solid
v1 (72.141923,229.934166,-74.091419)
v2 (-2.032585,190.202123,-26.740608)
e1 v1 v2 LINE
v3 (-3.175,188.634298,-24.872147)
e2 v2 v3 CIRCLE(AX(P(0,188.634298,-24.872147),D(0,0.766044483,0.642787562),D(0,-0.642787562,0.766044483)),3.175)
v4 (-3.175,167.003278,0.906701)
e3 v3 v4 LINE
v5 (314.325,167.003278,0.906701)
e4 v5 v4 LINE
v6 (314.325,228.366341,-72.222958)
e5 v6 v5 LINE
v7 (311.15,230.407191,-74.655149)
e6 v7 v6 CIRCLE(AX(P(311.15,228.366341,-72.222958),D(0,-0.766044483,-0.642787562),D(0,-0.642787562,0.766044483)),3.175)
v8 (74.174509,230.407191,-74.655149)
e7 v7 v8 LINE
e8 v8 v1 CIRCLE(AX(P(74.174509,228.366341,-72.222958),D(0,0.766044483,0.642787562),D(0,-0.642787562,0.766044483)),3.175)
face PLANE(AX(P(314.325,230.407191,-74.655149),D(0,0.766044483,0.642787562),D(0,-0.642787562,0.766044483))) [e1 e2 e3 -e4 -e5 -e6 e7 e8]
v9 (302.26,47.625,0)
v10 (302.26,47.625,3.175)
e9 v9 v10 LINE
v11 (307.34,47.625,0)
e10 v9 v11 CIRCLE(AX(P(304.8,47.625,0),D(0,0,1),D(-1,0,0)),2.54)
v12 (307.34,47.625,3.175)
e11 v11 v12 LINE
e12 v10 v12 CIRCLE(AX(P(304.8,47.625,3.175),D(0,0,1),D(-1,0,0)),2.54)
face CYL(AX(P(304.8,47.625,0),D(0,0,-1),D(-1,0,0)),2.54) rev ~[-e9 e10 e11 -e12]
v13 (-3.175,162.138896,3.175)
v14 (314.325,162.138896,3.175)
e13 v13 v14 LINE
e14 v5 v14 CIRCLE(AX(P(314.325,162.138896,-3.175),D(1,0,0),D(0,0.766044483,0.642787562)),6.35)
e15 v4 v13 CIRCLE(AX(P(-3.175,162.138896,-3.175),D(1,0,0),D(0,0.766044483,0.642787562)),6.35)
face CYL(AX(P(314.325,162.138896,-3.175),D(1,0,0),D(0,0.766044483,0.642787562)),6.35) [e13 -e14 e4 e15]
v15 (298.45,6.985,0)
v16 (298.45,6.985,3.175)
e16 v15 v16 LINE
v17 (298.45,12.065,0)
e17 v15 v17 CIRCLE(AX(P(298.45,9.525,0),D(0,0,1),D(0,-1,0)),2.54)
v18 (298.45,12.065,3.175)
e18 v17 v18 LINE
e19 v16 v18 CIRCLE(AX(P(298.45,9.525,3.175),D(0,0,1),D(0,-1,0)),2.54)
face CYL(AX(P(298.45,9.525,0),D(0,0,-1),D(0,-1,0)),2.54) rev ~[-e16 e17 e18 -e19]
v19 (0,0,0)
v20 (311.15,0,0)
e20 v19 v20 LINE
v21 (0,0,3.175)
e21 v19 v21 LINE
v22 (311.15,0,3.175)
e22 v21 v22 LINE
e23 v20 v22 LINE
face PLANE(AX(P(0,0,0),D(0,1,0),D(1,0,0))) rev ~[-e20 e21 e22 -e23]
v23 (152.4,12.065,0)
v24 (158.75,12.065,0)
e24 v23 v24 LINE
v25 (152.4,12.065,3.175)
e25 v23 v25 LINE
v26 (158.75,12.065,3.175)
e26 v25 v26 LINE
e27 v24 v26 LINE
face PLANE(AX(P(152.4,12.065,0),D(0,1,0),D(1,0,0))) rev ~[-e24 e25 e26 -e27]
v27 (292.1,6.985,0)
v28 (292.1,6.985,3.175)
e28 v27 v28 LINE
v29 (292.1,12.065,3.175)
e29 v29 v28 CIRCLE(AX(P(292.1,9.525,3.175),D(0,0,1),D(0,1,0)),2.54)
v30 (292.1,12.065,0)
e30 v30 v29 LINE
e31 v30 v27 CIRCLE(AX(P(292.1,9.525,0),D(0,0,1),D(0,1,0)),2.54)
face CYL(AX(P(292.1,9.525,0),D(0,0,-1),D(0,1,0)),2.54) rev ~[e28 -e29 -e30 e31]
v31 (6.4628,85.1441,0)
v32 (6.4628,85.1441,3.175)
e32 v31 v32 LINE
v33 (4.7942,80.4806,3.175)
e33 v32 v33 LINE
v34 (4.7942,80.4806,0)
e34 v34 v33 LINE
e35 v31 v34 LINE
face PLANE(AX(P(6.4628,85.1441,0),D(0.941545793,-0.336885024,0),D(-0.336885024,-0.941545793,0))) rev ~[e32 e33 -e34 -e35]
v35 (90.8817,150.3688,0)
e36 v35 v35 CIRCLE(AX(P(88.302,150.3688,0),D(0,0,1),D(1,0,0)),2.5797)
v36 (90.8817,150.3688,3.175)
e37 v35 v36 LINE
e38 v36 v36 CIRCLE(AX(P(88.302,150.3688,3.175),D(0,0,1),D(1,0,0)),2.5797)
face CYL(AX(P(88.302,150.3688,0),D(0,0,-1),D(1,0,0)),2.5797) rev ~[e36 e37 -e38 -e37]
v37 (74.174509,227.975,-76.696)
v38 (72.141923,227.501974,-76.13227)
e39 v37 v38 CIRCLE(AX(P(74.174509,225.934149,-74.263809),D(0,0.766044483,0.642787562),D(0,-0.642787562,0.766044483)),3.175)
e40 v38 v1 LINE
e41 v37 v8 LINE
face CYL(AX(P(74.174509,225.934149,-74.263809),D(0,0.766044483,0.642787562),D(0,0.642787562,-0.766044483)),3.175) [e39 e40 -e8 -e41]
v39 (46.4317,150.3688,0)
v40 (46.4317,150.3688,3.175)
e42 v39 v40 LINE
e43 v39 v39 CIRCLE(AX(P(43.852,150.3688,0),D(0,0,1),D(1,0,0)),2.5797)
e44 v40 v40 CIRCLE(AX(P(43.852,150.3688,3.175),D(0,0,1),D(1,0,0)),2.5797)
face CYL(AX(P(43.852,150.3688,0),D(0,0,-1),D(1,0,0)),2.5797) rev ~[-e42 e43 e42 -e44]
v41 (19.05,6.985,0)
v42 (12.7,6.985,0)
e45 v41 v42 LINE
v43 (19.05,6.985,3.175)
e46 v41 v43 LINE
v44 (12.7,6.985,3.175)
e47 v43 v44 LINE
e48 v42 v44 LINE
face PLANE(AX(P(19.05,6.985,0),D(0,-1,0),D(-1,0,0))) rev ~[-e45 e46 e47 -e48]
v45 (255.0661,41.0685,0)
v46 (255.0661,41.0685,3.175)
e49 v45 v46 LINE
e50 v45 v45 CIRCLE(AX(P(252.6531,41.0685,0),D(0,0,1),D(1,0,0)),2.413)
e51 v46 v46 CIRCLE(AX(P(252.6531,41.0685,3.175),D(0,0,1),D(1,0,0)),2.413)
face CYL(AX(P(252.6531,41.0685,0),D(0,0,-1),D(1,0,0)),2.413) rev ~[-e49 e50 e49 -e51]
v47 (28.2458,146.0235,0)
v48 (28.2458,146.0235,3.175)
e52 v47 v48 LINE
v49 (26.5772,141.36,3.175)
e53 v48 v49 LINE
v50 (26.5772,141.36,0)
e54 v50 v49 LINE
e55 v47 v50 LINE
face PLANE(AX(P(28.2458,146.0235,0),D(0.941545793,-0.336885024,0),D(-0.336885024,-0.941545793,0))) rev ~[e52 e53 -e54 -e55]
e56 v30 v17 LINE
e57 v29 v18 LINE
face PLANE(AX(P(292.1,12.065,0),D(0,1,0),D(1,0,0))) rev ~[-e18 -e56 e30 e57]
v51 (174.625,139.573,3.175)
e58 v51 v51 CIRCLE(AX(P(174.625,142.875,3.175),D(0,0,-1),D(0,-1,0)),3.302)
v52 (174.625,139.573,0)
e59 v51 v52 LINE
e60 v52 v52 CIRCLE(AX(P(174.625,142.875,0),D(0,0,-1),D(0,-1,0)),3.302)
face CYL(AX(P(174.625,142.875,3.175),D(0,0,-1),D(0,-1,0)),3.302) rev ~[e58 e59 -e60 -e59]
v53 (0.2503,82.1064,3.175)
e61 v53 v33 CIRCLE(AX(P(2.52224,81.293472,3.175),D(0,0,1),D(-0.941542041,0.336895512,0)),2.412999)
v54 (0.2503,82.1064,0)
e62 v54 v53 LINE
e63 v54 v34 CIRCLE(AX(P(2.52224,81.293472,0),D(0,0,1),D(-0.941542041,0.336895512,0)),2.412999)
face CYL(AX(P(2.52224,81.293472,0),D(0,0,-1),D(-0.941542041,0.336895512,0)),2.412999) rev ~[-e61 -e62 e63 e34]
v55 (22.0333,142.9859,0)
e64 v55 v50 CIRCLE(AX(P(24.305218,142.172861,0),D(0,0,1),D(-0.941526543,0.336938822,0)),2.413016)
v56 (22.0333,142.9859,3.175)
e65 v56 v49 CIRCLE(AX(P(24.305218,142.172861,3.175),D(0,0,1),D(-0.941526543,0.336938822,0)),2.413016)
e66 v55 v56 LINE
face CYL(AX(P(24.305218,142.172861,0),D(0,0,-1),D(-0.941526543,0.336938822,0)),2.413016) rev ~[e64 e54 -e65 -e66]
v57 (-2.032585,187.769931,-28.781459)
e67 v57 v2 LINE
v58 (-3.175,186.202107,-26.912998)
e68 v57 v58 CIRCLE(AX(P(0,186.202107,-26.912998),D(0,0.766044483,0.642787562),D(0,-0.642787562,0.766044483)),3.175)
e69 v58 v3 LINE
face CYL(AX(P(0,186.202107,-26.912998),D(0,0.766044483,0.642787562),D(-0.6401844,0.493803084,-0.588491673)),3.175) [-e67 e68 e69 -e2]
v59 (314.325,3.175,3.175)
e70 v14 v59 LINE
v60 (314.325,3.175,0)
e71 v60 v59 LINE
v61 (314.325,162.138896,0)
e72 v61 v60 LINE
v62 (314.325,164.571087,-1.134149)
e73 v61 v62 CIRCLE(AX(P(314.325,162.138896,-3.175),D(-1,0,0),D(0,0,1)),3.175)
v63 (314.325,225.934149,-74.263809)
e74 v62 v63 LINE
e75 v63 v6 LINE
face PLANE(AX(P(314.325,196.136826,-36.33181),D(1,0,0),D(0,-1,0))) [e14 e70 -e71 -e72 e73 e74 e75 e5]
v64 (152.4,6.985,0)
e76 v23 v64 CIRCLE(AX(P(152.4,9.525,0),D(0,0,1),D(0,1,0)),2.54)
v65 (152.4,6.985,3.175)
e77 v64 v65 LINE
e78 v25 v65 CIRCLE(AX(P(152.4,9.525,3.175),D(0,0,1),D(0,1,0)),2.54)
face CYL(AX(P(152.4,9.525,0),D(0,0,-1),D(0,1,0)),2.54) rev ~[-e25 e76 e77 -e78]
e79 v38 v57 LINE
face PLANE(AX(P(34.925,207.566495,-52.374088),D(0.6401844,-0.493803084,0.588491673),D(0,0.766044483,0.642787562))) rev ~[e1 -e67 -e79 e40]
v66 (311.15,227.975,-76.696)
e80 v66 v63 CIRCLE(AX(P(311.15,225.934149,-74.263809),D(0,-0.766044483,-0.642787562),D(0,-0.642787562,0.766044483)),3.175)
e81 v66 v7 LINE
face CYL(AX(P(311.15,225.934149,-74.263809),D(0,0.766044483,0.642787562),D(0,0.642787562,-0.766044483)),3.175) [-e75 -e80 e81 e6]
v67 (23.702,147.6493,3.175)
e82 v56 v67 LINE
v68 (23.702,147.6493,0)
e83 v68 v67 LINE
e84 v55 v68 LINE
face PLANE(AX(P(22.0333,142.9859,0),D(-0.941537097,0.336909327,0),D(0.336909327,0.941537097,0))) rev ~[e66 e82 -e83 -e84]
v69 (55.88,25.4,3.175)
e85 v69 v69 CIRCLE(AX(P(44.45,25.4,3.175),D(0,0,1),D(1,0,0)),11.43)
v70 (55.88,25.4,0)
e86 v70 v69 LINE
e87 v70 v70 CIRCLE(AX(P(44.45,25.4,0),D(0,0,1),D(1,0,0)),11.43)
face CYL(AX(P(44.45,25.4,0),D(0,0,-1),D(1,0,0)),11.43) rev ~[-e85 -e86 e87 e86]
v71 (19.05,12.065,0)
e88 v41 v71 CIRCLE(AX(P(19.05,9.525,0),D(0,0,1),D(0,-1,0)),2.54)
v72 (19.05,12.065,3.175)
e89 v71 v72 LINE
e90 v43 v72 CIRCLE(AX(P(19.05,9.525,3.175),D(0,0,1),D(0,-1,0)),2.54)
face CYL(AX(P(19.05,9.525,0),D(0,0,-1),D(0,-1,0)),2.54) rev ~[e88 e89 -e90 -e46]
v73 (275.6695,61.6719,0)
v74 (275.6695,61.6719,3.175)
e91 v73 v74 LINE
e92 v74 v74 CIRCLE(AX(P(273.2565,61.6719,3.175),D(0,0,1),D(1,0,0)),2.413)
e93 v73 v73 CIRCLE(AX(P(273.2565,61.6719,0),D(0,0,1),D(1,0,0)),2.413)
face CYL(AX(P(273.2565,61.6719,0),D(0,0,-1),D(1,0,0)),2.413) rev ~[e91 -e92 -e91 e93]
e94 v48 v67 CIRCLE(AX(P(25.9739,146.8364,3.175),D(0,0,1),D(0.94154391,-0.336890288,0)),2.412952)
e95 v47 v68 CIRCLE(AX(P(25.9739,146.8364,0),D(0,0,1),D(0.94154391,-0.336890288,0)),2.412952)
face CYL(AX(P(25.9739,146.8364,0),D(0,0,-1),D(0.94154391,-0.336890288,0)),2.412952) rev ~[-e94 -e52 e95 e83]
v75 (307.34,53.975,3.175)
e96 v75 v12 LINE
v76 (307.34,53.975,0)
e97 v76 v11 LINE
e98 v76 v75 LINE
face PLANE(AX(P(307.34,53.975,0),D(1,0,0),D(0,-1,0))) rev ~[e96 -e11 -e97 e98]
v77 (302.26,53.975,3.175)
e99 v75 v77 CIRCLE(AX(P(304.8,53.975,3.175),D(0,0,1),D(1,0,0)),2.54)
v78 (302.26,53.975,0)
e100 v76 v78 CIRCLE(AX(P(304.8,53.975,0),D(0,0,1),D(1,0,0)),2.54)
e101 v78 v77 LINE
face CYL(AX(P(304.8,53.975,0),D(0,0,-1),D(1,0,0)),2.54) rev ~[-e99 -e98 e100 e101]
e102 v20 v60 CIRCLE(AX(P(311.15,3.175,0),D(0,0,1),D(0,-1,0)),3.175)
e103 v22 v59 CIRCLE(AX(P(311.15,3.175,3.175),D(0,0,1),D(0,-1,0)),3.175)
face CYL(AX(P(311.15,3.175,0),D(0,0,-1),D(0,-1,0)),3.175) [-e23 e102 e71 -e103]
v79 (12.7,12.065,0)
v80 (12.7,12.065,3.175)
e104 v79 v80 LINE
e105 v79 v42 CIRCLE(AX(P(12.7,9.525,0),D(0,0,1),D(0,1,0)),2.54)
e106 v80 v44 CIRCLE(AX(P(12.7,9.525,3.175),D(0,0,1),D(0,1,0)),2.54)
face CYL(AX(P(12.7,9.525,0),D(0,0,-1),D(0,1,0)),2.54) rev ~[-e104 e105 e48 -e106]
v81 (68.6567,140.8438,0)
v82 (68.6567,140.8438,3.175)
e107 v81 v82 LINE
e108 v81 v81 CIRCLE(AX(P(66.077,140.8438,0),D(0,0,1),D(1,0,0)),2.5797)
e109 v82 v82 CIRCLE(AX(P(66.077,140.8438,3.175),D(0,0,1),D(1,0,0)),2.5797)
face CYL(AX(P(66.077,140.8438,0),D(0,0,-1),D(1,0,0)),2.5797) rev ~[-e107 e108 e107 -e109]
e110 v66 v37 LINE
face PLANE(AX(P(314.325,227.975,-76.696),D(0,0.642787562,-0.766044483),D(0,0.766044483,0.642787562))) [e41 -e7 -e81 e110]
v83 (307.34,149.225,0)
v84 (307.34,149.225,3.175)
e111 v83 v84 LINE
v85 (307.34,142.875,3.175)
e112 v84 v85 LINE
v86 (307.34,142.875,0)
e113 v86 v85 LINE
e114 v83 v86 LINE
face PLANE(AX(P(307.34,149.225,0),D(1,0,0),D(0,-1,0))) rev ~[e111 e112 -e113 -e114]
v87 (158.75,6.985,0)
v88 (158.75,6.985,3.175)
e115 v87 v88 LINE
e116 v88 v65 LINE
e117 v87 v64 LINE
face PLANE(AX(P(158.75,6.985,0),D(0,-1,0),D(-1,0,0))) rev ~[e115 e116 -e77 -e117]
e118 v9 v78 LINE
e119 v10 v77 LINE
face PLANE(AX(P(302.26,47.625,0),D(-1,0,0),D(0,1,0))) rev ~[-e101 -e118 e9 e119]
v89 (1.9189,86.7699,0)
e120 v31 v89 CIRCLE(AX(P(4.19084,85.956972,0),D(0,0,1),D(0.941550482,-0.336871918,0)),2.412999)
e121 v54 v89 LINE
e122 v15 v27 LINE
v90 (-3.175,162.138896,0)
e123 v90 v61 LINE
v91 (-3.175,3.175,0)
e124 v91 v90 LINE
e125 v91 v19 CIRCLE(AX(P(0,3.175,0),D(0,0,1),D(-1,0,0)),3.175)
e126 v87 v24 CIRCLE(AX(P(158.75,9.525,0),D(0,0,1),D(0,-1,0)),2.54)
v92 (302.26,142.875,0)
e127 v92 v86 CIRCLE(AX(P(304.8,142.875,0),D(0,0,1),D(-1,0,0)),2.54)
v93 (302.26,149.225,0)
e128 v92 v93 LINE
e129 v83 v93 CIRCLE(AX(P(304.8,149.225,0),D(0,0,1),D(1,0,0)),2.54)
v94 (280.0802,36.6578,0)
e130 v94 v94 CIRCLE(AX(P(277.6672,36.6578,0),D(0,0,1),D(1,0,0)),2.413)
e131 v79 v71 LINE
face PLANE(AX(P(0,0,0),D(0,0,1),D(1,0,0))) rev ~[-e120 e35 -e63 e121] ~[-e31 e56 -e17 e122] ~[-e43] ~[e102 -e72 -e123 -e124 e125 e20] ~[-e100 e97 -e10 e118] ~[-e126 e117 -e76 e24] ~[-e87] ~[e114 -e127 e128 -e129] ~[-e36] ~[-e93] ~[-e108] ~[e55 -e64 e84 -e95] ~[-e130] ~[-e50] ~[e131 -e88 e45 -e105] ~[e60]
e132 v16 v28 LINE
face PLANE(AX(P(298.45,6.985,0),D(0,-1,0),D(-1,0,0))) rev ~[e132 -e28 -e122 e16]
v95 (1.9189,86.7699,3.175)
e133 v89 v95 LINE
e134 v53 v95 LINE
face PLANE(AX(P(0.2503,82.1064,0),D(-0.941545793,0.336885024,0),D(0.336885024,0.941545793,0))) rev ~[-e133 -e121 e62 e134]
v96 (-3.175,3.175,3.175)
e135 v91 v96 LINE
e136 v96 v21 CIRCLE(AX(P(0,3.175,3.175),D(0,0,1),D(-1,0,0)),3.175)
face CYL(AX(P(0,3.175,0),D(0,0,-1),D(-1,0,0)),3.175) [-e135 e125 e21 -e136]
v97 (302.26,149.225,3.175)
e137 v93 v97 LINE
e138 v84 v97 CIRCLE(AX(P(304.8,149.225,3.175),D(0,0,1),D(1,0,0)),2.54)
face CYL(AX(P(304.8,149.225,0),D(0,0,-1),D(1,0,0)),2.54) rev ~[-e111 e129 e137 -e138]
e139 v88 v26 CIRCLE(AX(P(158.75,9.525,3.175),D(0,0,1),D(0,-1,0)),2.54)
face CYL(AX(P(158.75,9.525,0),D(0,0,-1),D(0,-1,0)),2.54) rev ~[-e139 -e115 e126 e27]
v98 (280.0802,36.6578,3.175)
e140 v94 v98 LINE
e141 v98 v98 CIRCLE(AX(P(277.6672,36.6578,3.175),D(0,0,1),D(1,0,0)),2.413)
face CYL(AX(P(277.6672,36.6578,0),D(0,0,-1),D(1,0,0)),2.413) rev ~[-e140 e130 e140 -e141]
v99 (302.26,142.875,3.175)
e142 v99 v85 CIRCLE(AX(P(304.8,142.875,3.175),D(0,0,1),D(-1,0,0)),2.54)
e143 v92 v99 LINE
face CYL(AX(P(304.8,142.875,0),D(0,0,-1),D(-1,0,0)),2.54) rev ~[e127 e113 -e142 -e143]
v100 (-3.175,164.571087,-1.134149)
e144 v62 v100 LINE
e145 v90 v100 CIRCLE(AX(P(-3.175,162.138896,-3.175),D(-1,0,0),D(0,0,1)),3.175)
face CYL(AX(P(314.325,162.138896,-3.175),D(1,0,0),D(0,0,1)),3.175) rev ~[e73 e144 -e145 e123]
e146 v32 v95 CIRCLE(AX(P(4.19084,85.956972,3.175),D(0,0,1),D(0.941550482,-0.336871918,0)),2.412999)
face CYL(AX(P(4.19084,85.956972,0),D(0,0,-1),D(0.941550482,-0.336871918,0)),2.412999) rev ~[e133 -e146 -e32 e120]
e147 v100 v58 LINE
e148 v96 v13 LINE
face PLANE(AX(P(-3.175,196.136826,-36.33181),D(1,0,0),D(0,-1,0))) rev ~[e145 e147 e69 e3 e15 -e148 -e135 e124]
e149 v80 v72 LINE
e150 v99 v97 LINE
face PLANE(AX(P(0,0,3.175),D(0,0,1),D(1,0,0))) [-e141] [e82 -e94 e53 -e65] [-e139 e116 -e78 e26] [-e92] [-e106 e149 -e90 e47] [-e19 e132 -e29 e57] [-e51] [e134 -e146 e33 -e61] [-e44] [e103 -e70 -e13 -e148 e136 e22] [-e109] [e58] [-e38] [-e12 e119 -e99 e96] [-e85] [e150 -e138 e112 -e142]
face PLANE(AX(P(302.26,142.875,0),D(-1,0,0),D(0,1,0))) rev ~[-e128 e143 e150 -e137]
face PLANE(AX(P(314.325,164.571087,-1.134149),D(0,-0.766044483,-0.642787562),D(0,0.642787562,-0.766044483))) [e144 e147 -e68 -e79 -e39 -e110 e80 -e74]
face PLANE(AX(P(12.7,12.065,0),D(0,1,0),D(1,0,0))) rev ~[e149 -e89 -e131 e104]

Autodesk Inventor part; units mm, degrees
ref_plane "YZ Plane" through (0, 0, 0) normal (1, 0, 0) x (0, 1, 0)
ref_plane "XZ Plane" through (0, 0, 0) normal (0, 1, 0) x (-1, 0, 0)
ref_plane "XY Plane" through (0, 0, 0) normal (0, 0, 1) x (1, 0, 0)
sketch "Sketch1" plane through (0, 0, 0) normal (0, 0, 1) x (1, 0, 0)
  arc A0 (-3.175, 3.175) -> (0, 0) centre (0, 3.175) ccw
  line L0 (0, 0) -> (311.15, 0)
  arc A1 (311.15, 0) -> (314.325, 3.175) centre (311.15, 3.175) ccw
  line L1 (314.325, 3.175) -> (314.325, 161.925)
  line L2 (311.15, 165.1) -> (12.1553, 165.1)
  line L3 (-3.175, 149.7697) -> (-3.175, 3.175)
  line L4 (292.1, 12.065) -> (298.45, 12.065)
  arc A2 (298.45, 6.985) -> (298.45, 12.065) centre (298.45, 9.525) ccw
  line L5 (298.45, 6.985) -> (292.1, 6.985)
  arc A3 (292.1, 12.065) -> (292.1, 6.985) centre (292.1, 9.525) ccw
  line L6 (302.26, 47.625) -> (302.26, 53.975)
  arc A4 (307.34, 53.975) -> (302.26, 53.975) centre (304.8, 53.975) ccw
  line L7 (307.34, 53.975) -> (307.34, 47.625)
  arc A5 (302.26, 47.625) -> (307.34, 47.625) centre (304.8, 47.625) ccw
  line L8 (152.4, 12.065) -> (158.75, 12.065)
  arc A6 (158.75, 6.985) -> (158.75, 12.065) centre (158.75, 9.525) ccw
  line L9 (158.75, 6.985) -> (152.4, 6.985)
  arc A7 (152.4, 12.065) -> (152.4, 6.985) centre (152.4, 9.525) ccw
  line L10 (12.7, 12.065) -> (19.05, 12.065)
  arc A8 (19.05, 6.985) -> (19.05, 12.065) centre (19.05, 9.525) ccw
  line L11 (19.05, 6.985) -> (12.7, 6.985)
  arc A9 (12.7, 12.065) -> (12.7, 6.985) centre (12.7, 9.525) ccw
  line L12 (302.26, 142.875) -> (302.26, 149.225)
  arc A10 (307.34, 149.225) -> (302.26, 149.225) centre (304.8, 149.225) ccw
  line L13 (307.34, 149.225) -> (307.34, 142.875)
  arc A11 (302.26, 142.875) -> (307.34, 142.875) centre (304.8, 142.875) ccw
  line L14 (0.2503, 82.1064) -> (1.9189, 86.7699)
  arc A12 (6.4628, 85.1441) -> (1.9189, 86.7699) centre (4.1909, 85.957) ccw
  line L15 (6.4628, 85.1441) -> (4.7942, 80.4806)
  arc A13 (0.2503, 82.1064) -> (4.7942, 80.4806) centre (2.5223, 81.2935) ccw
  line L16 (28.2458, 146.0235) -> (26.5772, 141.36)
  arc A14 (22.0333, 142.9859) -> (26.5772, 141.36) centre (24.3053, 142.1729) ccw
  line L17 (22.0333, 142.9859) -> (23.702, 147.6493)
  arc A15 (28.2458, 146.0235) -> (23.702, 147.6493) centre (25.9739, 146.8364) ccw
  circle A16 centre (88.302, 150.3688) radius 2.5797
  circle A17 centre (66.077, 140.8438) radius 2.5797
  circle A18 centre (43.852, 150.3688) radius 2.5797
  circle A19 centre (273.2565, 61.6719) radius 2.413
  circle A20 centre (252.6531, 41.0685) radius 2.413
  circle A21 centre (277.6672, 36.6578) radius 2.413
  circle A22 centre (44.45, 25.4) radius 11.43
  line L18 (12.1553, 165.1) -> (-3.175, 165.1)
  line L19 (-3.175, 165.1) -> (-3.175, 149.7697)
  line L20 (314.325, 161.925) -> (314.325, 165.1)
  line L21 (314.325, 165.1) -> (311.15, 165.1)
  point P0 (0, 0)
  point P1 (-3.175, 3.175)
  point P2 (0, 0)
  point P3 (314.325, 3.175)
  point P4 (22.0333, 142.9859)
  point P5 (23.702, 147.6493)
  point P6 (28.2458, 146.0235)
  point P7 (26.5772, 141.36)
  point P8 (6.4628, 85.1441)
  point P9 (19.05, 6.985)
  point P10 (158.75, 6.985)
  point P11 (298.45, 6.985)
  dimension "GapSize" = 3.175
extrude "Plate1" add sketch "Sketch1" along normal blind 3.175
sketch "Sketch2" plane through (314.325, 162.6678, 1.1341) normal (0, 0.7660444, 0.6427876) x (-1, 0, 0)
  line L0 (317.5, 0) -> (0, 0)
  line L1 (0, 0) -> (0, -101.6)
  line L2 (0, -101.6) -> (317.5, -101.6)
  line L3 (317.5, -101.6) -> (317.5, 0)
edge flange "Flange1" height 101.6 angle 50 thickness 3.175 bend radius 3.175 thickness toward (0, 0.7660444, 0.6427876) relief tear relief width 3.175 relief depth 1.5875 edges at (161.6526, 165.1, 0) wall of the first edge with corners at (-3.175, 162.6678, 1.1341) (314.325, 162.6678, 1.1341) (314.325, 227.975, -76.696) (-3.175, 227.975, -76.696)
bend "Bend1"
corner "Corner1"
chamfer "Corner Chamfer1" distance 76.2 distance2 63.5 1 edges at (-3.175, 229.1911, -75.6755) measured on face at (102.6583, 228.7858, -76.0157)
sketch "Sketch3" plane through (0, 0, 3.175) normal (0, 0, 1) x (1, 0, 0)
  line L0 (311.15, 0) -> (0, 0) projected
  line L1 (-3.175, 3.175) -> (-3.175, 162.1389) projected
  point P0 (174.625, 142.875)
  dimension "d149" = 142.875
  dimension "d150" = 177.8
hole "Hole1" at (174.625, 142.875, 3.175) direction (0, 0, -1) diameter 6.604 end through all
fillet "Corner Round1" radius 3.175 3 edges at (314.325, 229.1911, -75.6755) (73.025, 229.1911, -75.6755) (-3.175, 188.3741, -27.0317)
equation "\"GapSize\" = Thickness"
equation "\"d156\" = Thickness"
equation "\"d135\" = Thickness"
equation "\"d136\" = BendReliefWidth"
equation "\"d137\" = BendReliefDepth"
equation "\"d138\" = MinimumRemnant"
equation "\"d139\" = TransitionRadius"
equation "\"d142\" = BendRadius"
equation "\"d143\" = CornerReliefSize"
equation "\"d144\" = GapSize"
equation "\"d145\" = JacobiRadiusSize"
equation "\"BendRadius\" = Thickness"
equation "\"BendReliefWidth\" = Thickness"
equation "\"BendReliefDepth\" = 0.5 * Thickness"
equation "\"CornerReliefSize\" = 4 * Thickness"
equation "\"MinimumRemnant\" = 2 * Thickness"
equation "\"TransitionRadius\" = BendRadius"
equation "\"JacobiRadiusSize\" = BendRadius"
equation "\"Thickness\" = 3.175"
properties part number "TURRET,WIRE,PLATE,BOTTOM" material "Polycarbonate, Clear"
